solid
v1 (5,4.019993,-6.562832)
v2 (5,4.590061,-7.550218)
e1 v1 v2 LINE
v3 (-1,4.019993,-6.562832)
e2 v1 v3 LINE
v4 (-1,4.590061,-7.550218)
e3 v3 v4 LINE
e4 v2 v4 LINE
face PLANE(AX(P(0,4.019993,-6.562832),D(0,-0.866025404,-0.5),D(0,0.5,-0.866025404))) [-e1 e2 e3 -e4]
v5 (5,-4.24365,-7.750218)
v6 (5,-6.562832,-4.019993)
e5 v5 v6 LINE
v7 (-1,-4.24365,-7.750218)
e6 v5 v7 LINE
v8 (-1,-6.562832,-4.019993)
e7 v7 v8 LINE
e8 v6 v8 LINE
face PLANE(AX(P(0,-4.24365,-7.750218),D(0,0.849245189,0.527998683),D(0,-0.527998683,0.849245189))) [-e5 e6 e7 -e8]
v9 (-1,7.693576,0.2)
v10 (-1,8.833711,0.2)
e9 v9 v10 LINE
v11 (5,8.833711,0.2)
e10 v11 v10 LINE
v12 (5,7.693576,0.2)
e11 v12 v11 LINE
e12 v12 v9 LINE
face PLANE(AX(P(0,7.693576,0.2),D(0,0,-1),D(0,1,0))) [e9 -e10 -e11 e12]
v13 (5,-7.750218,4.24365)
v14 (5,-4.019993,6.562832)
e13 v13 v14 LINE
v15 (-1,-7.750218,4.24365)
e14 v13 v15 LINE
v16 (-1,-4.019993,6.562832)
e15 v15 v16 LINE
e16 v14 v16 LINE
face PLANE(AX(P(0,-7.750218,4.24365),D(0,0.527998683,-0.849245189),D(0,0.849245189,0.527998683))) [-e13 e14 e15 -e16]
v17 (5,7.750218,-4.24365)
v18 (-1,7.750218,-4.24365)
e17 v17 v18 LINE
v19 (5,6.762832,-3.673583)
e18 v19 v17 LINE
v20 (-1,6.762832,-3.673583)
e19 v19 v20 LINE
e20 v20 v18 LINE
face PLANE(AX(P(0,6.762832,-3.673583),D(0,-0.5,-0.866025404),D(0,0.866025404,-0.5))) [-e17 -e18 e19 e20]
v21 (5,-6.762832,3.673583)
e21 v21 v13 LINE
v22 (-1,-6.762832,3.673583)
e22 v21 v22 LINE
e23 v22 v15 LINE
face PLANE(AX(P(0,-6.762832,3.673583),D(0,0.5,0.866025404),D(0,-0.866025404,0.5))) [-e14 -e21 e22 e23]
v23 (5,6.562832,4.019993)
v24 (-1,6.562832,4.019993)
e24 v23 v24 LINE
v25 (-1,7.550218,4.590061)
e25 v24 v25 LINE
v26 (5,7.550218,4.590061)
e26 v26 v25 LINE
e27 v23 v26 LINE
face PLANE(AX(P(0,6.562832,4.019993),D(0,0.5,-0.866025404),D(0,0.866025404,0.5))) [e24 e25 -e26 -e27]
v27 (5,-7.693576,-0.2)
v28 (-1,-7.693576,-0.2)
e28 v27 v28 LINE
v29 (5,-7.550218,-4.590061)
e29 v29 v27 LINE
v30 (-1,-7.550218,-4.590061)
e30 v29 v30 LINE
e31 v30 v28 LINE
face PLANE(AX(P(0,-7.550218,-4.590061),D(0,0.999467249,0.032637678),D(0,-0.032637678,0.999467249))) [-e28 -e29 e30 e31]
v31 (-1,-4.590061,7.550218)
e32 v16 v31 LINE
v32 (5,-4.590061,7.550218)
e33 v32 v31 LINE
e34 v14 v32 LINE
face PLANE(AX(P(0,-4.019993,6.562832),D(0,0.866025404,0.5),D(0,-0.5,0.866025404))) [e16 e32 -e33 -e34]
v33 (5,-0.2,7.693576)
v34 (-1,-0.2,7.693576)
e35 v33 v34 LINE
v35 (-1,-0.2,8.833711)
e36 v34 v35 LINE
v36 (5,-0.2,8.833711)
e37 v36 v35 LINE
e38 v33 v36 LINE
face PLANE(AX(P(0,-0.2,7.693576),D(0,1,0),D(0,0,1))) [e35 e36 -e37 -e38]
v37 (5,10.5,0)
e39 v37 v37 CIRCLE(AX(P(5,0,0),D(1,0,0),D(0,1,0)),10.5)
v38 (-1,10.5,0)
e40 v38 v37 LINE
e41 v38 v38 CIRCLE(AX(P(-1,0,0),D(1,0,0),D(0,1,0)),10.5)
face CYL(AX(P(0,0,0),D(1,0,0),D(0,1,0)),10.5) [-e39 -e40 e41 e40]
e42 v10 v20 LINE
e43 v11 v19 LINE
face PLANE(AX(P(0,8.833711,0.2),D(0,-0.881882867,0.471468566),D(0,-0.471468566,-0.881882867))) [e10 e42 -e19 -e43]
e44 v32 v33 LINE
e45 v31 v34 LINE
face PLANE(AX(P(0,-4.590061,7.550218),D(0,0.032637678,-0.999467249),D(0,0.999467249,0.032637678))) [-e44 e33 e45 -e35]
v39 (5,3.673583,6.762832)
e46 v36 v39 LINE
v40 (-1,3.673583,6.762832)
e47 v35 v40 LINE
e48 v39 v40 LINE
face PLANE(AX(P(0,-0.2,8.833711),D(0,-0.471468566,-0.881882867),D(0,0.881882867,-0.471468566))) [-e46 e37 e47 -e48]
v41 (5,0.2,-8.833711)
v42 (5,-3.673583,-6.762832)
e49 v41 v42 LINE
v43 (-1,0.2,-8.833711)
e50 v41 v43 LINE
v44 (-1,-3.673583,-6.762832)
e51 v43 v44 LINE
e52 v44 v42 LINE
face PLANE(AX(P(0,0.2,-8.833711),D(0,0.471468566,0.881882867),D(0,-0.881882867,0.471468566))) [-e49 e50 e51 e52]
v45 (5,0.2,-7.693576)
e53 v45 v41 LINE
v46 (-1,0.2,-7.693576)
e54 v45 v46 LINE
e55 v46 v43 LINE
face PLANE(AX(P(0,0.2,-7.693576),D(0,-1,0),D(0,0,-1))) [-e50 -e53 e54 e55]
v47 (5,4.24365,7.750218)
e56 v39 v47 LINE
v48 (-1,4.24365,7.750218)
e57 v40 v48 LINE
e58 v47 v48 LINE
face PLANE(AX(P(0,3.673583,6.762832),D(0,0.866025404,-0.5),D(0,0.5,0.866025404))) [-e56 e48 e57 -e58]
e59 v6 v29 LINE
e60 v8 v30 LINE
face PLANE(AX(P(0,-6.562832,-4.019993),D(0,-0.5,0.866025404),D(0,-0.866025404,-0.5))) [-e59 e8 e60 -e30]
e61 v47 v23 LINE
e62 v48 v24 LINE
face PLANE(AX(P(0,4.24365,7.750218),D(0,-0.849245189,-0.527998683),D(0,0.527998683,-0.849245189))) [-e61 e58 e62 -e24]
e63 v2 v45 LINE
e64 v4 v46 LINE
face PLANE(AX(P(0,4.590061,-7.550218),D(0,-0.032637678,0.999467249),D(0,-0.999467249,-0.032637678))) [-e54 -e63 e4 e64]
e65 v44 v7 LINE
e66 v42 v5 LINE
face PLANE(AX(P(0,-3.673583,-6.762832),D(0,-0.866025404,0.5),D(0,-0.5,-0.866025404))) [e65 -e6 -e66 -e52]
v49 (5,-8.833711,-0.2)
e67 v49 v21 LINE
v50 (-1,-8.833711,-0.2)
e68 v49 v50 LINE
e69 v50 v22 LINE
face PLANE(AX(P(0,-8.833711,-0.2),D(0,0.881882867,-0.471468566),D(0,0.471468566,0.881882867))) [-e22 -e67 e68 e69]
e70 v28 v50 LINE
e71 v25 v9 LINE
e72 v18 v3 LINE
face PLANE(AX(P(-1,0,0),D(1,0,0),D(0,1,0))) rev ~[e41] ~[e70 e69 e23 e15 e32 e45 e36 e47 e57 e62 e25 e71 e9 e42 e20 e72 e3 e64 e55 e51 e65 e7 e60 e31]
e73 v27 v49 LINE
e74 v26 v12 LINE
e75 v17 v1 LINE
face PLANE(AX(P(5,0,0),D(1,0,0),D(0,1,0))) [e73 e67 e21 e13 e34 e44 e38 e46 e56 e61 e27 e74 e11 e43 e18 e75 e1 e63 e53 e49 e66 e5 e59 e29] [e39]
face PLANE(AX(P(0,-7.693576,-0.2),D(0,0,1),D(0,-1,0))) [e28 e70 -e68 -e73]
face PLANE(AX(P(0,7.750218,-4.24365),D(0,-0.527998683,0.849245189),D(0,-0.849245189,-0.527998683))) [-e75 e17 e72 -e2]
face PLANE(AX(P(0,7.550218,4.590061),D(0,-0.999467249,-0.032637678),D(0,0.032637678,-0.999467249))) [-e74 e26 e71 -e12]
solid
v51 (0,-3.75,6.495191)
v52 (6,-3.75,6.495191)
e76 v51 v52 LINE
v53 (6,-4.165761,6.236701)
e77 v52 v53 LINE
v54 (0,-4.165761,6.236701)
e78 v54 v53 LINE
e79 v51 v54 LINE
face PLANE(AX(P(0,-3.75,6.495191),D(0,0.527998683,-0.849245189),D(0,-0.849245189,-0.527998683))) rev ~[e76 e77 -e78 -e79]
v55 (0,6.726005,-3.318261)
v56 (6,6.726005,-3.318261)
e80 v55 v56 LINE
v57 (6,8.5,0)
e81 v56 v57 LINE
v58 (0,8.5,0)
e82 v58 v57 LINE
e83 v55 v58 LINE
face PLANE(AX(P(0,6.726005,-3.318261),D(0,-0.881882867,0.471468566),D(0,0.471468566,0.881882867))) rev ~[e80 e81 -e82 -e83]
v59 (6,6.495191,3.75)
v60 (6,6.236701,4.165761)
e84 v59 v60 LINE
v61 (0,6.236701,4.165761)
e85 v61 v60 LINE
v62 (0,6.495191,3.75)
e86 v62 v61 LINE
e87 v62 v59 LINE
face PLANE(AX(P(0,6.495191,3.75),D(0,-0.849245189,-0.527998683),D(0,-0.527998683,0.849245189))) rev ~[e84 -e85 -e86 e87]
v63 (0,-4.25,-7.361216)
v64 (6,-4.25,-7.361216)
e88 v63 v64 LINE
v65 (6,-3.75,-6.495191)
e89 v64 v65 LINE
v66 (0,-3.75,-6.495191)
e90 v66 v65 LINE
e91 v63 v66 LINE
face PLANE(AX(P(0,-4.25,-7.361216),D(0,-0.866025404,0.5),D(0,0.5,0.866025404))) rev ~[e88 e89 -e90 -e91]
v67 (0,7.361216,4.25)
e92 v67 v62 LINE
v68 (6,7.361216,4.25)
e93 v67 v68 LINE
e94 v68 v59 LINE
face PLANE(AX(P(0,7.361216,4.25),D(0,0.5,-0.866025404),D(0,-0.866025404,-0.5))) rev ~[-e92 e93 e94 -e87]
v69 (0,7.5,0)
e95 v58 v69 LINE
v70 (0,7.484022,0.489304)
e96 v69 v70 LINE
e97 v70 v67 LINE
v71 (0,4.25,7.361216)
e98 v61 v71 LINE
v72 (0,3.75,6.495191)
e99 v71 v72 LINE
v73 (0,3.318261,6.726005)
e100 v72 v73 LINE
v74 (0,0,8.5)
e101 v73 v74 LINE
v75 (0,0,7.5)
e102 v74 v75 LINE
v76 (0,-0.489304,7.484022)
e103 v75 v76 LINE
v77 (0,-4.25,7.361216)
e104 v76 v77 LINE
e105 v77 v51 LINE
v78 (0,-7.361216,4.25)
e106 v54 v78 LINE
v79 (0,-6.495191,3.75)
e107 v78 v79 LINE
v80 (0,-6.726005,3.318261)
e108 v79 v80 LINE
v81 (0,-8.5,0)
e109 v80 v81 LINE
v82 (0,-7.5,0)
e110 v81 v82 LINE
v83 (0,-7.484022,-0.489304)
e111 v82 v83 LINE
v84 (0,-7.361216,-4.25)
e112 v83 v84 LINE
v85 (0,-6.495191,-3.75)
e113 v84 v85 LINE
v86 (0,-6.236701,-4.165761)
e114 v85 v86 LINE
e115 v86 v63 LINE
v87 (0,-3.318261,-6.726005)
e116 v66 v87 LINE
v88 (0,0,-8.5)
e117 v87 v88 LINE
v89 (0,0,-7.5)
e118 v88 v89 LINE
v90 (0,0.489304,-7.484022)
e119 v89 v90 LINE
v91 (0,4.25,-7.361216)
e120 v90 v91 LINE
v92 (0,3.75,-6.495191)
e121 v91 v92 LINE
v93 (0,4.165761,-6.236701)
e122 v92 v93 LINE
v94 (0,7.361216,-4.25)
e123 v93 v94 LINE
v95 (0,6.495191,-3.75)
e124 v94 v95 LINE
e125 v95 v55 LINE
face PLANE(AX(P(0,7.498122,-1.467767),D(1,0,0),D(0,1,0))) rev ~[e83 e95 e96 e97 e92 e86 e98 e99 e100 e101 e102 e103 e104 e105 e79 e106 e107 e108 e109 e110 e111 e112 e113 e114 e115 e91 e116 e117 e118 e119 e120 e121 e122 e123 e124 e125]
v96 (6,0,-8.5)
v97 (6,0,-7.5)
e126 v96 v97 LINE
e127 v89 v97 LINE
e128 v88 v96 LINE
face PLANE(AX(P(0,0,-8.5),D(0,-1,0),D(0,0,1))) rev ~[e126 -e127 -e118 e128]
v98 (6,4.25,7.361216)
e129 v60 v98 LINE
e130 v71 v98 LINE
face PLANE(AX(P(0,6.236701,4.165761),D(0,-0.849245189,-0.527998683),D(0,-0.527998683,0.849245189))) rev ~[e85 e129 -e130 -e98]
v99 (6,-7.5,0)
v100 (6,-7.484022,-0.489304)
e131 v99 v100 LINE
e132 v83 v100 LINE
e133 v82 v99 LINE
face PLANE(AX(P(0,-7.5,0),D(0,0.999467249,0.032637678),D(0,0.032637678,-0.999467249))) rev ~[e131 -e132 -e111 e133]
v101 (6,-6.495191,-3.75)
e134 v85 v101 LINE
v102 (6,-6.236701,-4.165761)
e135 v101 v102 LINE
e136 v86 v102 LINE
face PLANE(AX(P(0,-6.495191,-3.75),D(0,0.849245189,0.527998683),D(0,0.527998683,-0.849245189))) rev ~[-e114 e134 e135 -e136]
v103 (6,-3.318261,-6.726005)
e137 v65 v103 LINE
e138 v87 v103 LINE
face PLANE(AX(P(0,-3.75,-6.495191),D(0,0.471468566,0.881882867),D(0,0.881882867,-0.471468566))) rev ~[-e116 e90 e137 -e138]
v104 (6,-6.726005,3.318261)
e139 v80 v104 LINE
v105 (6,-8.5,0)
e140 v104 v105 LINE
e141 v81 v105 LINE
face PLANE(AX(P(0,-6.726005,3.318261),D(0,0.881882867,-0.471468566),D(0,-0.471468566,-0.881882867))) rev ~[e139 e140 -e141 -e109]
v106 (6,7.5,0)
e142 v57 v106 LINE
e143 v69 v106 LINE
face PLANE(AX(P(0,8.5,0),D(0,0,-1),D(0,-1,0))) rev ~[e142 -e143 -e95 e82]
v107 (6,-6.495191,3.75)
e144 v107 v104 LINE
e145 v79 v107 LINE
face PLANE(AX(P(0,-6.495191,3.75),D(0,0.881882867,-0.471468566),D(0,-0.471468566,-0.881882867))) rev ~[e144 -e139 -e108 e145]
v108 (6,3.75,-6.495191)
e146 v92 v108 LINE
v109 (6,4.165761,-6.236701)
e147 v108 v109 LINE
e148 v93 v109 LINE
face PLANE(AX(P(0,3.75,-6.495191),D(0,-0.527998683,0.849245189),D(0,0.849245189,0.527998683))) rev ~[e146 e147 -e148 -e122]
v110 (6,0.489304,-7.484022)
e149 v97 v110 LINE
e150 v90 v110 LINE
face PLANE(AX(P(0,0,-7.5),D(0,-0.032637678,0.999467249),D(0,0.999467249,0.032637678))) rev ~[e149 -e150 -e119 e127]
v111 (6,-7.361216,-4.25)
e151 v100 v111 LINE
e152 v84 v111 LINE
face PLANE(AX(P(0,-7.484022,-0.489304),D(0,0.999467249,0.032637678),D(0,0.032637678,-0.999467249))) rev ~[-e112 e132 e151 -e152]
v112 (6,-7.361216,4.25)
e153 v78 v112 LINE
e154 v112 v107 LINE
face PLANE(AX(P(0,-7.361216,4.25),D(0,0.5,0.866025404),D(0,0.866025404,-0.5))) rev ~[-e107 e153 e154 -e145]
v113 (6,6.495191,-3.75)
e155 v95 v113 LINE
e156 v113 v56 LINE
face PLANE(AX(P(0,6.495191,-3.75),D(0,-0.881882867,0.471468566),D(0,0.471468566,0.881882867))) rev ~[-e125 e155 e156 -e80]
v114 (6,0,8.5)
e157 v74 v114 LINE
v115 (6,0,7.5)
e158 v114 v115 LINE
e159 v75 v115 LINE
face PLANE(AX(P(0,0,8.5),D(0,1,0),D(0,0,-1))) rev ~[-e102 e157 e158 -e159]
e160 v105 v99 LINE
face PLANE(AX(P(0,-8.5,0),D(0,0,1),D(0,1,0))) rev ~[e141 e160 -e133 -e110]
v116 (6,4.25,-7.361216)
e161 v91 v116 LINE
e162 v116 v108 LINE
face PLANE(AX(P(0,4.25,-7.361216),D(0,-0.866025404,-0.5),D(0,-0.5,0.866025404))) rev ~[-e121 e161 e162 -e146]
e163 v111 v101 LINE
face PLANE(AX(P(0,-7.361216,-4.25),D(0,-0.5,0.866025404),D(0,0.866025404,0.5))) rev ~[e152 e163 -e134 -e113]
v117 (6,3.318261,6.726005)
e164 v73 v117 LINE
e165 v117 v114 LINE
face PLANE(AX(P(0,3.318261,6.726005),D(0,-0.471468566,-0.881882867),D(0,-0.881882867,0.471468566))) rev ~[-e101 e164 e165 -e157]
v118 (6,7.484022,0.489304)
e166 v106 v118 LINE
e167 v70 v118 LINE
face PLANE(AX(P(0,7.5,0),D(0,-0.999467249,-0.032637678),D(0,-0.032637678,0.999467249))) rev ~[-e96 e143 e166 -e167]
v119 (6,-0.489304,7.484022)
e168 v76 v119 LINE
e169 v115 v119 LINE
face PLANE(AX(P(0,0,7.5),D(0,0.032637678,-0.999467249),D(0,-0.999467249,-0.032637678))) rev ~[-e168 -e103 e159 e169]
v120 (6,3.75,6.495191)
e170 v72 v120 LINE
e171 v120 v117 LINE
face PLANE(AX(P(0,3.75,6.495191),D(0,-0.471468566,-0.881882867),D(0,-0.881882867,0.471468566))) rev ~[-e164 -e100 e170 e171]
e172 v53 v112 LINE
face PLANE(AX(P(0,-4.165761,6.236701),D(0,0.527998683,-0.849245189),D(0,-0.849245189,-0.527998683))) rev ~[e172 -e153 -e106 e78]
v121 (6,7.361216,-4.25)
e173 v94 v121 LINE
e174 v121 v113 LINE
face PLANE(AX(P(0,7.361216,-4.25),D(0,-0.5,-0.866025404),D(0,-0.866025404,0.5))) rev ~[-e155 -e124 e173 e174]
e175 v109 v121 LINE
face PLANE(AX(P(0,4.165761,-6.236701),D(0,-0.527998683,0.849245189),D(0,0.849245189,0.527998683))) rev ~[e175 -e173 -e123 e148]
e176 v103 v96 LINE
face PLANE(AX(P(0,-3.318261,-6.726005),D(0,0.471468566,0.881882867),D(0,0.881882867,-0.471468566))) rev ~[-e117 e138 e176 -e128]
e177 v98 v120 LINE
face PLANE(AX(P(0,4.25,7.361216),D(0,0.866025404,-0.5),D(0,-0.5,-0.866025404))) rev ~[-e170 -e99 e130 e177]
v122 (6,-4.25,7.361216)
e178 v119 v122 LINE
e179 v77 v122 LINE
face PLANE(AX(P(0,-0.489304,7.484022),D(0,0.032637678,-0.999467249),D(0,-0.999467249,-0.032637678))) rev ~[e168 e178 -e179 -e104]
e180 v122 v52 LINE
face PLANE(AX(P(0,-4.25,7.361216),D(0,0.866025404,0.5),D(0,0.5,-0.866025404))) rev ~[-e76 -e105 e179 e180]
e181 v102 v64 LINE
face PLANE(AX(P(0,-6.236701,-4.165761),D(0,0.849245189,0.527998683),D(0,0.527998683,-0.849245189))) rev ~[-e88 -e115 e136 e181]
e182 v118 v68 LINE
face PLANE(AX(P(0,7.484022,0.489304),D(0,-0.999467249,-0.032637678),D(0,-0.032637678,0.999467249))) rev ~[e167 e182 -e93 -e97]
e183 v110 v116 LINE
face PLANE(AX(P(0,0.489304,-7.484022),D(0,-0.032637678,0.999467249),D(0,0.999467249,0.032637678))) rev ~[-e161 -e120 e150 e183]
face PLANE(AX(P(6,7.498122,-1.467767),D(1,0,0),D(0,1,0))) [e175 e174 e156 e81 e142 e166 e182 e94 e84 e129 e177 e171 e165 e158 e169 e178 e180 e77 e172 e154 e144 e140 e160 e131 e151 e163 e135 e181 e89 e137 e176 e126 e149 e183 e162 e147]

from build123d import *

# Parameters (mm, degrees)
F1_DEPTH      = 6
F0_R          = 10.5
F2_DEPTH      = 5
F2_DEPTH_BACK = 1


with BuildPart() as f1:
    # F0 (on Right) → F1 (new body)
    with BuildSketch(Plane.YZ):
        with BuildLine():
            Line((8.5, 0), (7.5, 0))
            ThreePointArc((7.5, 0), (7.3039386076, -1.7036668737), (6.7260051156, -3.3182608675))
            Line((6.7260051156, -3.3182608675), (8.5, 0))
        make_face()
        with BuildLine():
            ThreePointArc((6.7260051156, -3.3182608675), (7.3039386076, -1.7036668737), (7.5, 0))
            Line((7.5, 0), (7.4840217299, 0.4893043502))
            ThreePointArc((7.4840217299, 0.4893043502), (7.1772298187, 2.1765505116), (6.4951905284, 3.75))
            Line((6.4951905284, 3.75), (6.2367007655, 4.1657608623))
            ThreePointArc((6.2367007655, 4.1657608623), (5.127388096, 5.473562945), (3.75, 6.4951905284))
            Line((3.75, 6.4951905284), (3.3182608675, 6.7260051156))
            ThreePointArc((3.3182608675, 6.7260051156), (1.7036668737, 7.3039386076), (0, 7.5))
            Line((0, 7.5), (-0.4893043502, 7.4840217299))
            ThreePointArc((-0.4893043502, 7.4840217299), (-2.1765505116, 7.1772298187), (-3.75, 6.4951905284))
            Line((-3.75, 6.4951905284), (-4.1657608623, 6.2367007655))
            ThreePointArc((-4.1657608623, 6.2367007655), (-5.473562945, 5.127388096), (-6.4951905284, 3.75))
            Line((-6.4951905284, 3.75), (-6.7260051156, 3.3182608675))
            ThreePointArc((-6.7260051156, 3.3182608675), (-7.3039386076, 1.7036668737), (-7.5, 0))
            Line((-7.5, 0), (-7.4840217299, -0.4893043502))
            ThreePointArc((-7.4840217299, -0.4893043502), (-7.1772298187, -2.1765505116), (-6.4951905284, -3.75))
            Line((-6.4951905284, -3.75), (-6.2367007655, -4.1657608623))
            ThreePointArc((-6.2367007655, -4.1657608623), (-5.127388096, -5.473562945), (-3.75, -6.4951905284))
            Line((-3.75, -6.4951905284), (-3.3182608675, -6.7260051156))
            ThreePointArc((-3.3182608675, -6.7260051156), (-1.7036668737, -7.3039386076), (0, -7.5))
            Line((0, -7.5), (0.4893043502, -7.4840217299))
            ThreePointArc((0.4893043502, -7.4840217299), (2.1765505116, -7.1772298187), (3.75, -6.4951905284))
            Line((3.75, -6.4951905284), (4.1657608623, -6.2367007655))
            ThreePointArc((4.1657608623, -6.2367007655), (5.473562945, -5.127388096), (6.4951905284, -3.75))
            Line((6.4951905284, -3.75), (6.7260051156, -3.3182608675))
        make_face()
        with BuildLine():
            ThreePointArc((6.4951905284, 3.75), (7.1772298187, 2.1765505116), (7.4840217299, 0.4893043502))
            Line((7.4840217299, 0.4893043502), (7.3612159322, 4.25))
            Line((7.3612159322, 4.25), (6.4951905284, 3.75))
        make_face()
        with BuildLine():
            Line((7.3612159322, -4.25), (6.4951905284, -3.75))
            ThreePointArc((6.4951905284, -3.75), (5.473562945, -5.127388096), (4.1657608623, -6.2367007655))
            Line((4.1657608623, -6.2367007655), (7.3612159322, -4.25))
        make_face()
        with BuildLine():
            ThreePointArc((3.75, 6.4951905284), (5.127388096, 5.473562945), (6.2367007655, 4.1657608623))
            Line((6.2367007655, 4.1657608623), (4.25, 7.3612159322))
            Line((4.25, 7.3612159322), (3.75, 6.4951905284))
        make_face()
        with BuildLine():
            Line((4.25, -7.3612159322), (3.75, -6.4951905284))
            ThreePointArc((3.75, -6.4951905284), (2.1765505116, -7.1772298187), (0.4893043502, -7.4840217299))
            Line((0.4893043502, -7.4840217299), (4.25, -7.3612159322))
        make_face()
        with BuildLine():
            ThreePointArc((0, 7.5), (1.7036668737, 7.3039386076), (3.3182608675, 6.7260051156))
            Line((3.3182608675, 6.7260051156), (0, 8.5))
            Line((0, 8.5), (0, 7.5))
        make_face()
        with BuildLine():
            Line((0, -8.5), (0, -7.5))
            ThreePointArc((0, -7.5), (-1.7036668737, -7.3039386076), (-3.3182608675, -6.7260051156))
            Line((-3.3182608675, -6.7260051156), (0, -8.5))
        make_face()
        with BuildLine():
            ThreePointArc((-3.75, 6.4951905284), (-2.1765505116, 7.1772298187), (-0.4893043502, 7.4840217299))
            Line((-0.4893043502, 7.4840217299), (-4.25, 7.3612159322))
            Line((-4.25, 7.3612159322), (-3.75, 6.4951905284))
        make_face()
        with BuildLine():
            Line((-4.25, -7.3612159322), (-3.75, -6.4951905284))
            ThreePointArc((-3.75, -6.4951905284), (-5.127388096, -5.473562945), (-6.2367007655, -4.1657608623))
            Line((-6.2367007655, -4.1657608623), (-4.25, -7.3612159322))
        make_face()
        with BuildLine():
            ThreePointArc((-6.4951905284, 3.75), (-5.473562945, 5.127388096), (-4.1657608623, 6.2367007655))
            Line((-4.1657608623, 6.2367007655), (-7.3612159322, 4.25))
            Line((-7.3612159322, 4.25), (-6.4951905284, 3.75))
        make_face()
        with BuildLine():
            Line((-7.3612159322, -4.25), (-6.4951905284, -3.75))
            ThreePointArc((-6.4951905284, -3.75), (-7.1772298187, -2.1765505116), (-7.4840217299, -0.4893043502))
            Line((-7.4840217299, -0.4893043502), (-7.3612159322, -4.25))
        make_face()
        with BuildLine():
            ThreePointArc((-7.5, 0), (-7.3039386076, 1.7036668737), (-6.7260051156, 3.3182608675))
            Line((-6.7260051156, 3.3182608675), (-8.5, 0))
            Line((-8.5, 0), (-7.5, 0))
        make_face()
    extrude(amount=F1_DEPTH)


with BuildPart() as f2:
    # F0 (on Right) → F2 (new body, two sides)
    with BuildSketch(Plane.YZ) as f2_sk:
        Circle(F0_R)
        Polygon((-3.6735826839, -6.7628320185), (-4.2436502465, -7.7502180007), (-6.5628319364, -4.0199929876), (-7.5502179186, -4.5900605502), (-7.6935756715, -0.2000000821), (-8.8337107967, -0.2000000821), (-6.7628320185, 3.6735826839), (-7.7502180007, 4.2436502465), (-4.0199929876, 6.5628319364), (-4.5900605502, 7.5502179186), (-0.2000000821, 7.6935756715), (-0.2000000821, 8.8337107967), (3.6735826839, 6.7628320185), (4.2436502465, 7.7502180007), (6.5628319364, 4.0199929876), (7.5502179186, 4.5900605502), (7.6935756715, 0.2000000821), (8.8337107967, 0.2000000821), (6.7628320185, -3.6735826839), (7.7502180007, -4.2436502465), (4.0199929876, -6.5628319364), (4.5900605502, -7.5502179186), (0.2000000821, -7.6935756715), (0.2000000821, -8.8337107967), align=None, mode=Mode.SUBTRACT)
    extrude(amount=F2_DEPTH)
    extrude(f2_sk.sketch, amount=-F2_DEPTH_BACK)


solid = Compound([f1.part, f2.part])
